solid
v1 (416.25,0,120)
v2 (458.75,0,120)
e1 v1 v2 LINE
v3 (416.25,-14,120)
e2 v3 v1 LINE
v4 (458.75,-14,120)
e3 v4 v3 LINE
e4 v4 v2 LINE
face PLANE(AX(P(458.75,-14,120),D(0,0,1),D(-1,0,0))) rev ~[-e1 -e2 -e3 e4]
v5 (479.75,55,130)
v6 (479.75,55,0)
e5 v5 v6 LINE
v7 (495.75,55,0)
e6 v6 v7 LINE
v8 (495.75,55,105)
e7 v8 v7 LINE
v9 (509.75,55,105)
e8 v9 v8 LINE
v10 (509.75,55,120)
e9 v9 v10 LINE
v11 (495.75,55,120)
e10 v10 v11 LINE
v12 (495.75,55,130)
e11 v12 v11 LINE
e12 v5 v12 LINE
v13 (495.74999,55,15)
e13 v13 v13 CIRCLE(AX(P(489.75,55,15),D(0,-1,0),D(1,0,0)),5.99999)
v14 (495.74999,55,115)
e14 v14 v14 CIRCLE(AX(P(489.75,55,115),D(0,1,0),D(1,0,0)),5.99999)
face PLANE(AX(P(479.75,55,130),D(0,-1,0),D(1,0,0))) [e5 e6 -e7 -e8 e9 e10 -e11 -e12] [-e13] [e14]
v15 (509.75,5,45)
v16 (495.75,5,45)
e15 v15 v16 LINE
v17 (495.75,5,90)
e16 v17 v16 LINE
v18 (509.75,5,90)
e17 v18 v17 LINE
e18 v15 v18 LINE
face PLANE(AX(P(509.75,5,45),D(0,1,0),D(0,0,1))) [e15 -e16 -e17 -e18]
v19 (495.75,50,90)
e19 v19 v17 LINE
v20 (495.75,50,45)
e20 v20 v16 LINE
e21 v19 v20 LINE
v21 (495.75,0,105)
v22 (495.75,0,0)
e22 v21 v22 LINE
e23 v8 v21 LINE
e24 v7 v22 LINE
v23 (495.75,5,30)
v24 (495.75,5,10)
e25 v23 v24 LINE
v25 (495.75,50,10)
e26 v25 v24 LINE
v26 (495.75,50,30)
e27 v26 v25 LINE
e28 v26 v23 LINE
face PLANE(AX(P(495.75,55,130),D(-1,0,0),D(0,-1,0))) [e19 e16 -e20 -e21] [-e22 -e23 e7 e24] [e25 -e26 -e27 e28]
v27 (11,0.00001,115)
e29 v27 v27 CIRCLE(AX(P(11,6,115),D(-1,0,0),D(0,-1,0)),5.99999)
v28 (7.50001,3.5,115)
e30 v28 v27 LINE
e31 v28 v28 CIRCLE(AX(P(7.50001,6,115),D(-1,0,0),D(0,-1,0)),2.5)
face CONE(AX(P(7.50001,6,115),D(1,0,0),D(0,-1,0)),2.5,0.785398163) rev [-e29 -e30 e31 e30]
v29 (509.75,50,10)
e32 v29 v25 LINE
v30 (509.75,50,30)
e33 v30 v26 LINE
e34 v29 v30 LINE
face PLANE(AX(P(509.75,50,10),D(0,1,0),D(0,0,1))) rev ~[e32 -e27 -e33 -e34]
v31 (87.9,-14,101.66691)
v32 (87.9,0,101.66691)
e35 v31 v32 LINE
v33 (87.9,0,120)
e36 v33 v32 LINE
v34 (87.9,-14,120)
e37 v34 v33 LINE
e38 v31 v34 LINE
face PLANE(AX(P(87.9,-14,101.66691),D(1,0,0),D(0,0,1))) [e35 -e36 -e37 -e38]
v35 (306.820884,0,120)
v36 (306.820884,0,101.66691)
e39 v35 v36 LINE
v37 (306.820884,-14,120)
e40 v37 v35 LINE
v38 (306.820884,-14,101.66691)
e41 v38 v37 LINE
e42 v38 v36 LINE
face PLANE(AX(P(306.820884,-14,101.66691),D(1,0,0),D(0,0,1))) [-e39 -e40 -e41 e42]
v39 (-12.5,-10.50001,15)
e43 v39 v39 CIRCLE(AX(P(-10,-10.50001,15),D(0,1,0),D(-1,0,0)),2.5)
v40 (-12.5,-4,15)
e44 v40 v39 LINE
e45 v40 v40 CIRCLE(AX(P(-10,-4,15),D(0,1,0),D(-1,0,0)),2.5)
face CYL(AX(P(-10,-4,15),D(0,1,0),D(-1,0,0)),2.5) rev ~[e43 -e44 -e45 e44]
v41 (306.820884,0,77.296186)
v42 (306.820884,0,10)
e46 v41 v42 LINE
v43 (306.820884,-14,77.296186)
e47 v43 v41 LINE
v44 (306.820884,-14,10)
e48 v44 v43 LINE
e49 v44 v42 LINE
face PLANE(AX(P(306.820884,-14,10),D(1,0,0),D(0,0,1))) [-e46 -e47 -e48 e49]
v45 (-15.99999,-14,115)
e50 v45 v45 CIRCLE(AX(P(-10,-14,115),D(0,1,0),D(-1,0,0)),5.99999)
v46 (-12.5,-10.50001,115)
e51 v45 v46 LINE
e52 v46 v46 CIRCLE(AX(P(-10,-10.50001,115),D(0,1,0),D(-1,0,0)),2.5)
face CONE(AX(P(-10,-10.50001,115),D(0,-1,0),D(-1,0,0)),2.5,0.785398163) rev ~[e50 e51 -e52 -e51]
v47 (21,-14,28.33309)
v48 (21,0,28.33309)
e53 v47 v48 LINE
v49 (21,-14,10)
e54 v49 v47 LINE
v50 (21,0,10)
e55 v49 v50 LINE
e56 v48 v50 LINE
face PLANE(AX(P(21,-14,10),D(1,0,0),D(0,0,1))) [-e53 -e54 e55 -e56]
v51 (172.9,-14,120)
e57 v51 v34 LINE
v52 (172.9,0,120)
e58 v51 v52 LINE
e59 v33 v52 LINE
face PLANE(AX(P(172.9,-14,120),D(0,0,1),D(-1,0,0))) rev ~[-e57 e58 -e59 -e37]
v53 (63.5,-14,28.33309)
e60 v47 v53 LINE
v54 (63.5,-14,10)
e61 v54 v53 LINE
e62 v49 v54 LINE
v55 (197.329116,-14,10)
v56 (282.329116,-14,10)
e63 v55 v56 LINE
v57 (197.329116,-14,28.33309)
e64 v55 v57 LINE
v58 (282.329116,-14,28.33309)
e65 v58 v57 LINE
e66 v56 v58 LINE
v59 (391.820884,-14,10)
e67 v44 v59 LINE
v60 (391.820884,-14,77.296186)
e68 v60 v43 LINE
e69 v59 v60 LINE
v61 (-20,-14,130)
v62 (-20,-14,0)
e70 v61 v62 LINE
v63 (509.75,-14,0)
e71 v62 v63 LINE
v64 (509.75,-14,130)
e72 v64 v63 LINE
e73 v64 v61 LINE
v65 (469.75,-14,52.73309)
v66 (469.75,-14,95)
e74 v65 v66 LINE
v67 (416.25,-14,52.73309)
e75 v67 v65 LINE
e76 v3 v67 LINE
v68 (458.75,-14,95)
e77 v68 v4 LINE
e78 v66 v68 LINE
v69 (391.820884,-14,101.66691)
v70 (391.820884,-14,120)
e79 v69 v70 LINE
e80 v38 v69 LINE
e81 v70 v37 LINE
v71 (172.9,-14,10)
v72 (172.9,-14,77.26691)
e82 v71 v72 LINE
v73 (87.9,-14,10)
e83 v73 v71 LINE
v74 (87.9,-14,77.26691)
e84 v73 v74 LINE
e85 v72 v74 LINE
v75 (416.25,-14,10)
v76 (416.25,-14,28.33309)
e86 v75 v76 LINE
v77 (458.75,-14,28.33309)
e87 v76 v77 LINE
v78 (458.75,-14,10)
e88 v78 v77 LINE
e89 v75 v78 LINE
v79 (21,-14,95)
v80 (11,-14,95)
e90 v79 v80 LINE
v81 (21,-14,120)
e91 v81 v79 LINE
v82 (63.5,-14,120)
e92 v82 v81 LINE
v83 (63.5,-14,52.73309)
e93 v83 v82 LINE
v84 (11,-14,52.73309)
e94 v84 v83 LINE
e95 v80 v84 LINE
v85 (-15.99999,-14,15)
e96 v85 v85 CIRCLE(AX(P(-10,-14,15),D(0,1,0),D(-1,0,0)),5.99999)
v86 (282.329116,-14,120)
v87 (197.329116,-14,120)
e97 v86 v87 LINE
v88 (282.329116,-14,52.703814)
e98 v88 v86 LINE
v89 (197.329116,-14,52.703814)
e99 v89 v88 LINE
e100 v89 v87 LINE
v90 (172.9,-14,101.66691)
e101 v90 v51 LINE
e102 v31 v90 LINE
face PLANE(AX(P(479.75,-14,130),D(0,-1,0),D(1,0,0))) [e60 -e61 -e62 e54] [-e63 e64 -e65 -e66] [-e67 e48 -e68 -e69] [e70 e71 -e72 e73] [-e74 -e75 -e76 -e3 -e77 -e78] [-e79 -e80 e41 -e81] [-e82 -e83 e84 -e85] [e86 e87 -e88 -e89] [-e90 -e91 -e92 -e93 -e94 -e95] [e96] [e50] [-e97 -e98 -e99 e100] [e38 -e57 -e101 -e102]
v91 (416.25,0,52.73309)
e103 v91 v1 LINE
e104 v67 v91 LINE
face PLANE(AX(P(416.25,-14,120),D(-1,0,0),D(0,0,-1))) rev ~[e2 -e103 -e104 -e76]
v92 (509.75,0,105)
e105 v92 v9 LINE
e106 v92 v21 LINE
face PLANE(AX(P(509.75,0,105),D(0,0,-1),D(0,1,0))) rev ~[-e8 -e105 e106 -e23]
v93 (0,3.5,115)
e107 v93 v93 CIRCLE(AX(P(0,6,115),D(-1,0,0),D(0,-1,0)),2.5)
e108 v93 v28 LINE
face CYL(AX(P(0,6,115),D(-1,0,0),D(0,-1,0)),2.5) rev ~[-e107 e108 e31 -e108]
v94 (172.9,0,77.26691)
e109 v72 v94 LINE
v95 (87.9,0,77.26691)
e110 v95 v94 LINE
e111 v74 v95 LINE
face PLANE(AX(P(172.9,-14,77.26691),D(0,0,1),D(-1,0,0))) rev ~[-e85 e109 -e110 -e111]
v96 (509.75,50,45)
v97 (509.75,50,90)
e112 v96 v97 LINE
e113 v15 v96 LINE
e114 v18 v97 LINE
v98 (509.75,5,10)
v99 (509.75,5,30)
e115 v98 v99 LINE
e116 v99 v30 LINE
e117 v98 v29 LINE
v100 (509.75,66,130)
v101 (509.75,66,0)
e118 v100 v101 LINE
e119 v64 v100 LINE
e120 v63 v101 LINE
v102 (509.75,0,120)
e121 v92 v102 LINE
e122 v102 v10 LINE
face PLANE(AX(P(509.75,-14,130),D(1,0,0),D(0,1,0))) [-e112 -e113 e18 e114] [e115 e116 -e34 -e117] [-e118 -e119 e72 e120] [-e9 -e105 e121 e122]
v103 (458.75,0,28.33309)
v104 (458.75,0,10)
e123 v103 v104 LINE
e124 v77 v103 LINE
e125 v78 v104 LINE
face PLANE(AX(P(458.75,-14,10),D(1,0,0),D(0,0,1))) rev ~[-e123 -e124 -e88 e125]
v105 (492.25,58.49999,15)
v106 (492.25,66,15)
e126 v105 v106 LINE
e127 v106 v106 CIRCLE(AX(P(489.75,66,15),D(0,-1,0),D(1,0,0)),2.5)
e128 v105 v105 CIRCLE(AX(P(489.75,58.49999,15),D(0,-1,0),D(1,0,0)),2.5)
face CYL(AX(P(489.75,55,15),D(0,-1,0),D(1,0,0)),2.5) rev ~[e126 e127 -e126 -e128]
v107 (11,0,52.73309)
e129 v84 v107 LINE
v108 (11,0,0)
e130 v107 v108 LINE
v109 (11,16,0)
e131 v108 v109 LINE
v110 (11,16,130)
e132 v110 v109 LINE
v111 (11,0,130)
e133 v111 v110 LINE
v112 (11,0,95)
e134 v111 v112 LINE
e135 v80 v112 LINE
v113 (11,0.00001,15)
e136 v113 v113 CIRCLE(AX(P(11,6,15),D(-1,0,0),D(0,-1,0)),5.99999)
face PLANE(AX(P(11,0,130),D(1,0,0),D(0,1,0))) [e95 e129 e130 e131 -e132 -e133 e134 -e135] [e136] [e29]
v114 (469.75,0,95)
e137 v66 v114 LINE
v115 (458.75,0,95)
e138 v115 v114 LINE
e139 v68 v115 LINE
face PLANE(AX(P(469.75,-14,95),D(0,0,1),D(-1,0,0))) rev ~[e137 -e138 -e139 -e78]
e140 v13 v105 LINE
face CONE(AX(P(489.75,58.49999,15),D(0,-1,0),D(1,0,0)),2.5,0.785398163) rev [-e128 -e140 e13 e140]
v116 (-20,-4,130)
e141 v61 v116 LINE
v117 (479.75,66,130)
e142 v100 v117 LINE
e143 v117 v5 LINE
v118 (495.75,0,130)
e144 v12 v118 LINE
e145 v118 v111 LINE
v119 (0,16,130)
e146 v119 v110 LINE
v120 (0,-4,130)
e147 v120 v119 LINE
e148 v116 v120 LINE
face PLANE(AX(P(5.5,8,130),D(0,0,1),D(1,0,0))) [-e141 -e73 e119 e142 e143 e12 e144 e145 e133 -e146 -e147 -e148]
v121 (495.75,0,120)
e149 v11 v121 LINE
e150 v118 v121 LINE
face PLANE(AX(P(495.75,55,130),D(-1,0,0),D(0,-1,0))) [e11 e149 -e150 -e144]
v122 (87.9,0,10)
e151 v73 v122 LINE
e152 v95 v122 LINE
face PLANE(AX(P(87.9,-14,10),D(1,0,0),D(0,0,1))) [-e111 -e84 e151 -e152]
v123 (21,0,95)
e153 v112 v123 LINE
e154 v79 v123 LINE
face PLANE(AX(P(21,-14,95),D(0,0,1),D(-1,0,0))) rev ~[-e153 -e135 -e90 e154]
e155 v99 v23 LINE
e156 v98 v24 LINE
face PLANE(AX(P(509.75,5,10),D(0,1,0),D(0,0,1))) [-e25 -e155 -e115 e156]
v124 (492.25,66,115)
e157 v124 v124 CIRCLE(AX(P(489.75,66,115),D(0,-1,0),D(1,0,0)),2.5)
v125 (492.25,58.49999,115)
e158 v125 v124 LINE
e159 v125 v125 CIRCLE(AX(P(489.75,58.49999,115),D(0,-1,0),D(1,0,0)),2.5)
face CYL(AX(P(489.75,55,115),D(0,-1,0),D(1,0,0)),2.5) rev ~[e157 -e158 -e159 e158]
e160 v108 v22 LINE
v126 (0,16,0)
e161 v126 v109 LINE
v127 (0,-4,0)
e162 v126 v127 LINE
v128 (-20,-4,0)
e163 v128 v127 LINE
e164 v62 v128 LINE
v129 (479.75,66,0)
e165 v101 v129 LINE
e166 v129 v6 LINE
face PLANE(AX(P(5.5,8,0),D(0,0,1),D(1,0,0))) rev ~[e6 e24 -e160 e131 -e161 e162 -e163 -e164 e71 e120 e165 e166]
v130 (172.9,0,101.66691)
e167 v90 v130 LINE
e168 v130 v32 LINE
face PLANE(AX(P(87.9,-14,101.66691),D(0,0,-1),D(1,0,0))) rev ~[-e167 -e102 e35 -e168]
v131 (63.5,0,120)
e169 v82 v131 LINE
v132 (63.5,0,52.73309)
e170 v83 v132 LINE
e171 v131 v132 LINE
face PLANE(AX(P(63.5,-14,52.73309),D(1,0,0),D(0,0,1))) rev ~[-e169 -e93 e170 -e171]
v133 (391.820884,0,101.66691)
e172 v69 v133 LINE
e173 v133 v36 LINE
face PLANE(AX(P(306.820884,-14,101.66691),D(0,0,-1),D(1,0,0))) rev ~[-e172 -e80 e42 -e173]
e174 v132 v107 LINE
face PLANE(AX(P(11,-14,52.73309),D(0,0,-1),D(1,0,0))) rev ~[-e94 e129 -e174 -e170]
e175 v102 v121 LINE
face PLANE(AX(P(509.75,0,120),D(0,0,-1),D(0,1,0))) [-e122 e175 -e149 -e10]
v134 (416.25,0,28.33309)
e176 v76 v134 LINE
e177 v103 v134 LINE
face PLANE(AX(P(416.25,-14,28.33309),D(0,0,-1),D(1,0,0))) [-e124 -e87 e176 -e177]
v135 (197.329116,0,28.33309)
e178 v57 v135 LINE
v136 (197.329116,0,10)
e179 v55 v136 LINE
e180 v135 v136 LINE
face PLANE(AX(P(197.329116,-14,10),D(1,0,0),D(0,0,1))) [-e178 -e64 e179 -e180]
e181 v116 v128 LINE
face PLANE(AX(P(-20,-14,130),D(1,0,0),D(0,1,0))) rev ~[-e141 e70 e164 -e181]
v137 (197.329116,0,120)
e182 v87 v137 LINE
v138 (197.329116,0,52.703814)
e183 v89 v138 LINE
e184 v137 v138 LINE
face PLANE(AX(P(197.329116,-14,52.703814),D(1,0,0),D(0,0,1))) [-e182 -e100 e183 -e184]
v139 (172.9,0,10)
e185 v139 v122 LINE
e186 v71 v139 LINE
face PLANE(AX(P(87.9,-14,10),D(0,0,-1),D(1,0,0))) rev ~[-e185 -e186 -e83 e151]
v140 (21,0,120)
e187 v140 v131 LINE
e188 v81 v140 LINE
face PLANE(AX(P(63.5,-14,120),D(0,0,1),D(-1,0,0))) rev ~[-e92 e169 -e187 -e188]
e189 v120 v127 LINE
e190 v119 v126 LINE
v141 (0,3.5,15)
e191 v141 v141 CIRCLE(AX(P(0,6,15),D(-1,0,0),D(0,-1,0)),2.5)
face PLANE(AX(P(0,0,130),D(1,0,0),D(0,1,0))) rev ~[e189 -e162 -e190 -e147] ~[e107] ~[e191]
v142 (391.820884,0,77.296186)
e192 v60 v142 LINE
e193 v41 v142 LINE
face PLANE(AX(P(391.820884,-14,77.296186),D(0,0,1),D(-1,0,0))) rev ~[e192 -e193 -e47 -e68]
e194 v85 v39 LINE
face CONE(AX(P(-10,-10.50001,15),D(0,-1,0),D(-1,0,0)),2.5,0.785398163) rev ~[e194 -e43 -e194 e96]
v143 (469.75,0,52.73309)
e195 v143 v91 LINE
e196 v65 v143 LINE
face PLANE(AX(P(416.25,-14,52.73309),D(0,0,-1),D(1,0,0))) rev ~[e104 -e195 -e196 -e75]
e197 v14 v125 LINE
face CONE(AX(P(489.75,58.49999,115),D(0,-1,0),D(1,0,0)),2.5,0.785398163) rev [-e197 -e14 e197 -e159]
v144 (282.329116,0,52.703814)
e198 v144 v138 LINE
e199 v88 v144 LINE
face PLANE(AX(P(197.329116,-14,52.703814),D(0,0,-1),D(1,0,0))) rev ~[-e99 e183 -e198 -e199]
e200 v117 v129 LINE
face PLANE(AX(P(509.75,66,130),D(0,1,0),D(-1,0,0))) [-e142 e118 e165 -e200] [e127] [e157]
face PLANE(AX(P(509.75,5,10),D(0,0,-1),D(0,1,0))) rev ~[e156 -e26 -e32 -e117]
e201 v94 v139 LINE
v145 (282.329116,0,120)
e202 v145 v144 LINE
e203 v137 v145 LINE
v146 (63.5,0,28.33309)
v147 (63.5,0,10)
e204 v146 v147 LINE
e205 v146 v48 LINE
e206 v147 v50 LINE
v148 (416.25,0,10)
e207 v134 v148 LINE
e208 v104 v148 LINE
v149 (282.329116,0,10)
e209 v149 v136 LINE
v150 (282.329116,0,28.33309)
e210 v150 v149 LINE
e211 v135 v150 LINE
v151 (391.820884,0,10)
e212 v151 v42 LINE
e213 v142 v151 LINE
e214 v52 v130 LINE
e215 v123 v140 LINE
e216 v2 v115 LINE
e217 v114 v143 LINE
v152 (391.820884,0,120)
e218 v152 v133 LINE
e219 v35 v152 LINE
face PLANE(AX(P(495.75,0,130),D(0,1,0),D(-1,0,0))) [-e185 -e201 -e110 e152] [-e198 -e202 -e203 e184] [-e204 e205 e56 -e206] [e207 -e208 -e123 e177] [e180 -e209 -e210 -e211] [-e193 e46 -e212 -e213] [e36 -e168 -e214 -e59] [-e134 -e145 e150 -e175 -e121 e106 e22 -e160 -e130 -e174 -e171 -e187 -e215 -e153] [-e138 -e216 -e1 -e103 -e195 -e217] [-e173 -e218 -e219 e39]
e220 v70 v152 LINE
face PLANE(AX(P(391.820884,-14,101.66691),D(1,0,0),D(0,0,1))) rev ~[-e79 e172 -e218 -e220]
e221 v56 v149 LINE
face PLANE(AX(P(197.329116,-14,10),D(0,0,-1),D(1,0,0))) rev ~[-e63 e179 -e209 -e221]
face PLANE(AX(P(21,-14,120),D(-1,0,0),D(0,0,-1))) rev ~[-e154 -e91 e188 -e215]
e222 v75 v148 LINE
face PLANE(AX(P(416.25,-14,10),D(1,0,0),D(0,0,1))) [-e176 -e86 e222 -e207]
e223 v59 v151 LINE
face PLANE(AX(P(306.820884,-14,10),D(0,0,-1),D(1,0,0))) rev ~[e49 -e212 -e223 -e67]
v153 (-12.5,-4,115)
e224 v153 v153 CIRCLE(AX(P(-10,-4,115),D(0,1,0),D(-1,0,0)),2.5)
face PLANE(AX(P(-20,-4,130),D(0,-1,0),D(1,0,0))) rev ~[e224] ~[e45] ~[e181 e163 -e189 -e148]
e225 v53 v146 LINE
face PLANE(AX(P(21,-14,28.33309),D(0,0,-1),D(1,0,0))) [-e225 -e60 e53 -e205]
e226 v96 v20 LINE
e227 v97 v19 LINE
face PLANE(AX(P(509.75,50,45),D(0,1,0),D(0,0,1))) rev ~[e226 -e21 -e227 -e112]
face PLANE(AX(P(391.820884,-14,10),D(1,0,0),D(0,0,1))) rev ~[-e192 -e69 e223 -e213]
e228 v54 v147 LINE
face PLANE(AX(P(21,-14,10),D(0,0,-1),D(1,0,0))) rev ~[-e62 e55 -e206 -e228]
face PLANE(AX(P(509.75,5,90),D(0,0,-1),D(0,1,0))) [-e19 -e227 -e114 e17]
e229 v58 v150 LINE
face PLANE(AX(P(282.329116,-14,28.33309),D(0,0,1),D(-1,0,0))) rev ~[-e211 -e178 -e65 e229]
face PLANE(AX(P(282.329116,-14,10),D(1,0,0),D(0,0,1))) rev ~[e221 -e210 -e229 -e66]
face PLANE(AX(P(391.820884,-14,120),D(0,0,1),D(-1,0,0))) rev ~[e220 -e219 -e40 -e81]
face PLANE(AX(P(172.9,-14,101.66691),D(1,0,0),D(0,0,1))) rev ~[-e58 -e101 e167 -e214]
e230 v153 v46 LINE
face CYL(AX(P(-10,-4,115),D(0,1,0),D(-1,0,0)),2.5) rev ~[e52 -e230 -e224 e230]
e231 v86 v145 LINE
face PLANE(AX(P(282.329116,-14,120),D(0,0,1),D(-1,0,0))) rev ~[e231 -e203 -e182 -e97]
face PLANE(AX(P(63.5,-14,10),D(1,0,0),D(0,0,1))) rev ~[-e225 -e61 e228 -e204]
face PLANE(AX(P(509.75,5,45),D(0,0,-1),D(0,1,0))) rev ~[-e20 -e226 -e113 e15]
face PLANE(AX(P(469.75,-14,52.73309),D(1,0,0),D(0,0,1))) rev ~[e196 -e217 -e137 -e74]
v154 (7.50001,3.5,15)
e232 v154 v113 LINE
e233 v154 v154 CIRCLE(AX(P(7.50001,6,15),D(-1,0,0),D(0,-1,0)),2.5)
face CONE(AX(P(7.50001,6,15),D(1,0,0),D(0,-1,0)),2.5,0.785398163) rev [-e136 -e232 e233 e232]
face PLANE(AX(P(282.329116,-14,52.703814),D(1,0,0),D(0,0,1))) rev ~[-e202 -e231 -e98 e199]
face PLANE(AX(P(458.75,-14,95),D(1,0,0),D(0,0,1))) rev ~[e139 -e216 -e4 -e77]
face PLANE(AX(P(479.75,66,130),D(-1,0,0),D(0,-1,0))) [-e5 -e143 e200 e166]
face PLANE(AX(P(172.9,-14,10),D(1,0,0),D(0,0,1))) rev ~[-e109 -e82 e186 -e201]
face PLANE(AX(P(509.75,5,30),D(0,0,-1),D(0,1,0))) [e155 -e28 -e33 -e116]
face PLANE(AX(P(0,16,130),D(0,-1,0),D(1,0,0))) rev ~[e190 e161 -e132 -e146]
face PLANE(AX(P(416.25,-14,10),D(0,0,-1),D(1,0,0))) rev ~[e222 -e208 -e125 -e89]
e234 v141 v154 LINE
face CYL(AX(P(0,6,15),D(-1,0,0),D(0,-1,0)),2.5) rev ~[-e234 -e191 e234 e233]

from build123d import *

# Parameters (mm, degrees)
F0_W           = 479.75
F0_H           = 130
F1_DEPTH       = 14
F2_W           = 20
F2_H           = 10
F3_DEPTH       = 130
F4_W           = 11
F4_H           = 16
F5_DEPTH       = 130
F6_W           = 42.5000000004
F6_H           = 18.3330895797
F6_W_2         = 42.5
F6_H_2         = 67.2669104207
F6_H_3         = 18.3330895795
F6_W_3         = 42.4708837634
F6_H_4         = 67.2961863439
F6_W_4         = 42.5291162366
F6_H_5         = 67.2961863442
F6_W_5         = 42.4708837635
F7_DEPTH       = 25
F8_R           = 2.5
F9_DEPTH       = 25
F10_R          = 2.5
F11_DEPTH      = 11.001
F11_DEPTH_BACK = 25
F12_R          = 2.5
F13_DEPTH      = 25
F14_SIZE       = 3.49999
F15_W          = 45
F15_H          = 20
F15_W_2        = 55
F15_H_2        = 15
F15_H_3        = 45
F16_DEPTH      = 25


# Not quite as in the source:
# - a fillet or chamfer is up to 0.001 mm smaller than in the source, because OpenCascade refuses the exact size
# - a feature names something its author has since deleted; it is built from what else it names


with BuildPart() as f1:
    # F0 (on Front) → F1 (new body)
    with BuildSketch(Plane.XZ):
        with Locations((239.875, 65)):
            Rectangle(F0_W, F0_H)
    extrude(amount=F1_DEPTH)

    # F2 (on face) → F3 (join, through all)
    with BuildSketch(Plane.XY.offset(130)):
        Polygon((479.75, 0), (479.75, -14), (509.75, -14), (509.75, 66), (479.75, 66), (479.75, 55), (495.75, 55), (495.75, 0), align=None)
        with Locations((-10, -9)):
            Rectangle(F2_W, F2_H)
    extrude(amount=-F3_DEPTH)

    # F4 (on face) → F5 (join, through all)
    with BuildSketch(Plane.XY.offset(130)):
        with Locations((5.5, 8)):
            Rectangle(F4_W, F4_H)
    extrude(amount=-F5_DEPTH)

    # F6 (on face) → F7 (cut)
    with BuildSketch(Plane.XZ.offset(14)):
        Polygon((21, 120), (21, 95), (11, 95), (11, 52.7330895796), (21, 52.7330895796), (63.5, 52.7330895796), (63.5, 120), align=None)
        with Locations((42.2499999998, 19.1665447897)):
            Rectangle(F6_W, F6_H)
        with Locations((109.15, 43.6334552101)):
            Rectangle(F6_W_2, F6_H_2)
        with Locations((151.65, 43.6334552101)):
            Rectangle(F6_W_2, F6_H_2)
        with Locations((109.15, 110.8334552102)):
            Rectangle(F6_W_2, F6_H_3)
        with Locations((151.65, 110.8334552102)):
            Rectangle(F6_W_2, F6_H_3)
        with Locations((218.5645581183, 86.351906828)):
            Rectangle(F6_W_3, F6_H_4)
        with Locations((261.0645581183, 86.351906828)):
            Rectangle(F6_W_4, F6_H_4)
        with Locations((218.5645581183, 19.1665447897)):
            Rectangle(F6_W_3, F6_H)
        with Locations((261.0645581183, 19.1665447897)):
            Rectangle(F6_W_4, F6_H)
        with Locations((328.0854418817, 43.6480931718)):
            Rectangle(F6_W_4, F6_H_5)
        with Locations((370.5854418817, 43.6480931718)):
            Rectangle(F6_W_5, F6_H_5)
        with Locations((370.5854418817, 110.8334552102)):
            Rectangle(F6_W_3, F6_H_3)
        with Locations((328.0854418817, 110.8334552102)):
            Rectangle(F6_W_4, F6_H_3)
        Polygon((458.75, 120), (416.25, 120), (416.25, 52.7330895795), (469.75, 52.7330895795), (469.75, 95), (458.75, 95), align=None)
        with Locations((437.5, 19.1665447897)):
            Rectangle(F6_W_2, F6_H)
    extrude(amount=-F7_DEPTH, mode=Mode.SUBTRACT)

    # F8 (on face) → F9 (cut)
    with BuildSketch(Plane(origin=(0, -4, 0), x_dir=(-1, 0, 0), z_dir=(0, 1, 0))):
        with Locations((10, 115)):
            Circle(F8_R)
        with Locations((10, 15)):
            Circle(F8_R)
    extrude(amount=-F9_DEPTH, mode=Mode.SUBTRACT)

    # F10 (on face) → F11 (cut, two sides)
    with BuildSketch(Plane.XZ.offset(-55)) as f11_sk:
        with Locations((489.75, 15)):
            Circle(F10_R)
        with Locations((489.75, 115)):
            Circle(F10_R)
    extrude(amount=-F11_DEPTH, mode=Mode.SUBTRACT)
    extrude(f11_sk.sketch, amount=F11_DEPTH_BACK, mode=Mode.SUBTRACT)

    # F12 (on face) → F13 (cut)
    with BuildSketch(Plane(origin=(0, 0, 0), x_dir=(0, -1, 0), z_dir=(-1, 0, 0))):
        with Locations((-6, 15)):
            Circle(F12_R)
        with Locations((-6, 115)):
            Circle(F12_R)
    extrude(amount=-F13_DEPTH, mode=Mode.SUBTRACT)

    # F14 (size 3.5 in the source; OpenCascade refuses exactly that, so slightly less here)
    f14_edges = [f1.edges().sort_by_distance(p)[0] for p in [
        (487.25, 55, 15),
        (487.25, 55, 115),
        (-7.5, -14, 15),
        (-7.5, -14, 115),
        (11, 8.5, 15),
        (11, 8.5, 115),
    ]]
    chamfer(f14_edges, length=F14_SIZE)

    # F15 (on face) → F16 (cut)
    with BuildSketch(Plane.YZ.offset(509.75)):
        with Locations((27.5, 20)):
            Rectangle(F15_W, F15_H)
        with Locations((27.5, 112.5)):
            Rectangle(F15_W_2, F15_H_2)
        with Locations((27.5, 67.5)):
            Rectangle(F15_W, F15_H_3)
    extrude(amount=-F16_DEPTH, mode=Mode.SUBTRACT)


solid = f1.part
